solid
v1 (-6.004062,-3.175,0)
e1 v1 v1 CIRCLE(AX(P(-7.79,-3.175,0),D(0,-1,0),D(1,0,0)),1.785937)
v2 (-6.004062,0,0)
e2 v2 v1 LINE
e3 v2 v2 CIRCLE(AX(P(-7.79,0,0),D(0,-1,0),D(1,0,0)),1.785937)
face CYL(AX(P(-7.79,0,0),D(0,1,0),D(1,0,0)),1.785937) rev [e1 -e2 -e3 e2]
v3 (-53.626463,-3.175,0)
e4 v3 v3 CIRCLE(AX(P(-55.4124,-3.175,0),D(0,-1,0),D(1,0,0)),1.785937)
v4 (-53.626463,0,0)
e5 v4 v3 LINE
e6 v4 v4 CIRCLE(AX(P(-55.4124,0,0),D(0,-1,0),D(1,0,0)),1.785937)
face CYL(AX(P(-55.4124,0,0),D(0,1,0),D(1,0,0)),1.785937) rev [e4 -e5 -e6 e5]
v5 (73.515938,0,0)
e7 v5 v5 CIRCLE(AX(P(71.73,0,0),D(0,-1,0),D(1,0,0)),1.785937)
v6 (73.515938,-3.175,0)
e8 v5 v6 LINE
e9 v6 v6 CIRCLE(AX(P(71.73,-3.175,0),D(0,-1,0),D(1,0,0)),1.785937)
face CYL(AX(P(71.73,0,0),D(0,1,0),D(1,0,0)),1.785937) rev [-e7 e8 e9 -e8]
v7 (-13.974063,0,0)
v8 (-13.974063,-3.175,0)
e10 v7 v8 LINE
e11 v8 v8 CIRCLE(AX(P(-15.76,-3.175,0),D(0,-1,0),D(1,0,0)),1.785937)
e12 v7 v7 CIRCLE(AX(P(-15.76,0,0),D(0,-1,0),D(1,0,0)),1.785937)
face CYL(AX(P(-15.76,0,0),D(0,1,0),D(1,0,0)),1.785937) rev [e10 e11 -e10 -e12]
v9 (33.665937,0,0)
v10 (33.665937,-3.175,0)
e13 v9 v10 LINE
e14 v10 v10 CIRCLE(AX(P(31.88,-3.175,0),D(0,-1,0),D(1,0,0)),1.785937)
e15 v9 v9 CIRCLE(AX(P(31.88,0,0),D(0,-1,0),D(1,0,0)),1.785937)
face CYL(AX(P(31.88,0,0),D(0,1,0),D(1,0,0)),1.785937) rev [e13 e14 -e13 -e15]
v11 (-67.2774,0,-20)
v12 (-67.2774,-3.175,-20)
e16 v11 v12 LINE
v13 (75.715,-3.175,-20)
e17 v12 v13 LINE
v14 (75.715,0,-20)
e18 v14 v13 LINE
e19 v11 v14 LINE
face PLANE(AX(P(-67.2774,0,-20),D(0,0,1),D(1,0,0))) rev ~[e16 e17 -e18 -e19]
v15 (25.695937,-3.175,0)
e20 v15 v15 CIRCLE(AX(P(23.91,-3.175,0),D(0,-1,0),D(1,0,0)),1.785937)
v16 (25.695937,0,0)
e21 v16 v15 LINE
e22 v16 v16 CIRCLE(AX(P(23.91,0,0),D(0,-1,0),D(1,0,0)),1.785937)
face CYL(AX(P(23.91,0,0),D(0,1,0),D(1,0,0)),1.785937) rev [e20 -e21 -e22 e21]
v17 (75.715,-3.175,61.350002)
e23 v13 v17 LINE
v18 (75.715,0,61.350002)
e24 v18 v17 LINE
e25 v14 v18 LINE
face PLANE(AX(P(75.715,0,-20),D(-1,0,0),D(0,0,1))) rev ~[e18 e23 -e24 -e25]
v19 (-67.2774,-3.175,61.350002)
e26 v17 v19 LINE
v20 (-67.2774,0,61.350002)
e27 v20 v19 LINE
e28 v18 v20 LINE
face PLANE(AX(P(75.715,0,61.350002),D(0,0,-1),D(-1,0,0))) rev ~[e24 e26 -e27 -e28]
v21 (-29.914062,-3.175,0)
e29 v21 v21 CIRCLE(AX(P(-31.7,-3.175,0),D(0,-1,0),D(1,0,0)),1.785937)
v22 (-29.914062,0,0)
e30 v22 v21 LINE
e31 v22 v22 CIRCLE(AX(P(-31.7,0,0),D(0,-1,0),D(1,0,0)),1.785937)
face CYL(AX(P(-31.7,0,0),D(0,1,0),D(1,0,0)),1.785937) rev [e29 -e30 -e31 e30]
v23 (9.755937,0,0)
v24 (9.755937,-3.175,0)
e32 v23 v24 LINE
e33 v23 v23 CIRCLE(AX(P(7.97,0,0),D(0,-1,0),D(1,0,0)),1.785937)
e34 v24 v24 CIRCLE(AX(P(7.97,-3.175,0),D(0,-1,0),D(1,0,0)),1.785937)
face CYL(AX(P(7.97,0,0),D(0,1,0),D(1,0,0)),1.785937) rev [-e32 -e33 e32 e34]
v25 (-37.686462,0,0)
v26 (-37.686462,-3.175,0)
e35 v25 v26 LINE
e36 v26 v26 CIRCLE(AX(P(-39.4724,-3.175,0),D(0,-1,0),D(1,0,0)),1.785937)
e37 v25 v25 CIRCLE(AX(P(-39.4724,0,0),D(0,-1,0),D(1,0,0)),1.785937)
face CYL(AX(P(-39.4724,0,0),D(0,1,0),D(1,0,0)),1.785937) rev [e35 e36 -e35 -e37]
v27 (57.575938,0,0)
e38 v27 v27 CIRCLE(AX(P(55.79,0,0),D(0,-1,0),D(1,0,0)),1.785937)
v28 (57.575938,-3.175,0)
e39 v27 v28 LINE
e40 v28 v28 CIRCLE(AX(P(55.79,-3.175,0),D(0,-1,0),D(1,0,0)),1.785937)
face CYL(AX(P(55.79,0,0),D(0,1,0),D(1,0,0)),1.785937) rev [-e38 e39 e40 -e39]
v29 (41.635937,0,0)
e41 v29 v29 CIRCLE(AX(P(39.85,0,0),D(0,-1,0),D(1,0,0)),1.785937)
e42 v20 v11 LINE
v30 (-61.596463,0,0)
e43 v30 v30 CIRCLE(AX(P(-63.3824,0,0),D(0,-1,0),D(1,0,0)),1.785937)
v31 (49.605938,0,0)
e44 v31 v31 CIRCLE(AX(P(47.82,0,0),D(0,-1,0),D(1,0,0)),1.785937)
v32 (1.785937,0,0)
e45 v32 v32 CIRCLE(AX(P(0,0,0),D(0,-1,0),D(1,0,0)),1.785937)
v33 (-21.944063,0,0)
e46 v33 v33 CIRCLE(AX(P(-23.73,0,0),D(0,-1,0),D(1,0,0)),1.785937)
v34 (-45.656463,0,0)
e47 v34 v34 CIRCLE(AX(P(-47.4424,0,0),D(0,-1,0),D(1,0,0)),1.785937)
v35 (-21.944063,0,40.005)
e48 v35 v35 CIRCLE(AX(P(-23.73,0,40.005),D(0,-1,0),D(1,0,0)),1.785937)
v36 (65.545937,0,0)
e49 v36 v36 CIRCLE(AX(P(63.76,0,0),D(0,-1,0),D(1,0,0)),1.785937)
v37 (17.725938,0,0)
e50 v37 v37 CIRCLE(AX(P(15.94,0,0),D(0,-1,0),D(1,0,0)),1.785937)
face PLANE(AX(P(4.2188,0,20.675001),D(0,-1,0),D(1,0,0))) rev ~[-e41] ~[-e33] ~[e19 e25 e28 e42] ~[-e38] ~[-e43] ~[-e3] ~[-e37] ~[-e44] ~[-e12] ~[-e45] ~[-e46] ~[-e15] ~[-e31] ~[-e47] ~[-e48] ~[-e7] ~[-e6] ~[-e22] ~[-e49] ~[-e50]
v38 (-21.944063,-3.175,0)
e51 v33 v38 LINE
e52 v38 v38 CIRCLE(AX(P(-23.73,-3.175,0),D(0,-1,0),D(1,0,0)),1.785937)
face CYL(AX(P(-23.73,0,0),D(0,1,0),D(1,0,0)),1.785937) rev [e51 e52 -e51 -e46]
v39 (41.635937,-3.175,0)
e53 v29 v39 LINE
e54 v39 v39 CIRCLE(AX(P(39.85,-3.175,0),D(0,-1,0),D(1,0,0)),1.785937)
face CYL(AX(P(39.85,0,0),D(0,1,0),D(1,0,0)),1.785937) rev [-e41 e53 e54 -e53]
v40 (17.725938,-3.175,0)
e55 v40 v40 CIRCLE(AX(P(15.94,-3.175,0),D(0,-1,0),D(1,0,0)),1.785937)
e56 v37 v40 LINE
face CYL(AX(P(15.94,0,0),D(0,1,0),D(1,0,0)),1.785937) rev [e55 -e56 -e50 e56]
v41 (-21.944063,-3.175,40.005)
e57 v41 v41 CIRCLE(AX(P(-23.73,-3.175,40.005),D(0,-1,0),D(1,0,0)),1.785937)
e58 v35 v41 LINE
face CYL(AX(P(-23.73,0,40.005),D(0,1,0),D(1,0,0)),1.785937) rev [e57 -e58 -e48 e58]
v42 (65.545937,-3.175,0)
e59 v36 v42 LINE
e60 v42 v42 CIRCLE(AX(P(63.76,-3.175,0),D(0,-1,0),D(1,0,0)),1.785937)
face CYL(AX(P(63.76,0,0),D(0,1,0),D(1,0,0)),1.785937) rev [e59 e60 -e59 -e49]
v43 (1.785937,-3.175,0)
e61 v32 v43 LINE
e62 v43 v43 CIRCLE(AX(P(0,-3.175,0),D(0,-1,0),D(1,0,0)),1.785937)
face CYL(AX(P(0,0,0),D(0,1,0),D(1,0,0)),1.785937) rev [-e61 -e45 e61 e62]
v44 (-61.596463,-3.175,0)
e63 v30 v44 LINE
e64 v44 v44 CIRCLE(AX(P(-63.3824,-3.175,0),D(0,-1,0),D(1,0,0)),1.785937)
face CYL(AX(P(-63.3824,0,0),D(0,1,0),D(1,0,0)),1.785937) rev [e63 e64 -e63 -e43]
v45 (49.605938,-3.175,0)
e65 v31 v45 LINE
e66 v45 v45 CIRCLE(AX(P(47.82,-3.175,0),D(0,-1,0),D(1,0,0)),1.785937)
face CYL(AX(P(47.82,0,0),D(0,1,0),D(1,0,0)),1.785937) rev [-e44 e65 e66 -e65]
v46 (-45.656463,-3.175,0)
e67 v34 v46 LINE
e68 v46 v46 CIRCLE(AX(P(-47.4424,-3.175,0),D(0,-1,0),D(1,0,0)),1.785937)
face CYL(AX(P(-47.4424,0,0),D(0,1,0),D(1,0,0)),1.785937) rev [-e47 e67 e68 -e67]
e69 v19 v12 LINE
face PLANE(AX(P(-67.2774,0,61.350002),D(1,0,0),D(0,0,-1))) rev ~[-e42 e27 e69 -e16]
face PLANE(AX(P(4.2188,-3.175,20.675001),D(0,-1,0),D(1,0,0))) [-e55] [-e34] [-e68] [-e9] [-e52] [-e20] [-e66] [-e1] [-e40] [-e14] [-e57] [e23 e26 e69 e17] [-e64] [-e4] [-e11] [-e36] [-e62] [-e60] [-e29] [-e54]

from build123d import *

# Parameters (mm, degrees)
F0_R     = 1.7859375
F1_DEPTH = 3.175


# Not quite as in the source:
# - a length typed as a fraction of an inch, garbled in the dataset ("3 / 203.2 mm" for 3/8 in), is restored


with BuildPart() as f1:
    # F0 (on Front) → F1 (new body)
    with BuildSketch(Plane.XZ):
        Polygon((75.715, -20), (75.715, 61.3500024), (-3.7115799668, 61.3500024), (-35.4027799668, 61.3500024), (-67.2774, 61.3500024), (-67.2774, -20), (-35.5862, -20), (-3.895, -20), align=None)
        with Locations((-63.3824, 0)):
            Circle(F0_R, mode=Mode.SUBTRACT)
        with Locations((-55.4124, 0)):
            Circle(F0_R, mode=Mode.SUBTRACT)
        with Locations((-47.4424, 0)):
            Circle(F0_R, mode=Mode.SUBTRACT)
        with Locations((-39.4724, 0)):
            Circle(F0_R, mode=Mode.SUBTRACT)
        with Locations((-31.7, 0)):
            Circle(F0_R, mode=Mode.SUBTRACT)
        with Locations((-23.73, 0)):
            Circle(F0_R, mode=Mode.SUBTRACT)
        with Locations((-15.76, 0)):
            Circle(F0_R, mode=Mode.SUBTRACT)
        with Locations((-7.79, 0)):
            Circle(F0_R, mode=Mode.SUBTRACT)
        Circle(F0_R, mode=Mode.SUBTRACT)
        with Locations((7.97, 0)):
            Circle(F0_R, mode=Mode.SUBTRACT)
        with Locations((15.94, 0)):
            Circle(F0_R, mode=Mode.SUBTRACT)
        with Locations((23.91, 0)):
            Circle(F0_R, mode=Mode.SUBTRACT)
        with Locations((31.88, 0)):
            Circle(F0_R, mode=Mode.SUBTRACT)
        with Locations((39.85, 0)):
            Circle(F0_R, mode=Mode.SUBTRACT)
        with Locations((47.82, 0)):
            Circle(F0_R, mode=Mode.SUBTRACT)
        with Locations((55.79, 0)):
            Circle(F0_R, mode=Mode.SUBTRACT)
        with Locations((63.76, 0)):
            Circle(F0_R, mode=Mode.SUBTRACT)
        with Locations((71.73, 0)):
            Circle(F0_R, mode=Mode.SUBTRACT)
        with Locations((-23.73, 40.005)):
            Circle(F0_R, mode=Mode.SUBTRACT)
    extrude(amount=F1_DEPTH)


solid = f1.part
